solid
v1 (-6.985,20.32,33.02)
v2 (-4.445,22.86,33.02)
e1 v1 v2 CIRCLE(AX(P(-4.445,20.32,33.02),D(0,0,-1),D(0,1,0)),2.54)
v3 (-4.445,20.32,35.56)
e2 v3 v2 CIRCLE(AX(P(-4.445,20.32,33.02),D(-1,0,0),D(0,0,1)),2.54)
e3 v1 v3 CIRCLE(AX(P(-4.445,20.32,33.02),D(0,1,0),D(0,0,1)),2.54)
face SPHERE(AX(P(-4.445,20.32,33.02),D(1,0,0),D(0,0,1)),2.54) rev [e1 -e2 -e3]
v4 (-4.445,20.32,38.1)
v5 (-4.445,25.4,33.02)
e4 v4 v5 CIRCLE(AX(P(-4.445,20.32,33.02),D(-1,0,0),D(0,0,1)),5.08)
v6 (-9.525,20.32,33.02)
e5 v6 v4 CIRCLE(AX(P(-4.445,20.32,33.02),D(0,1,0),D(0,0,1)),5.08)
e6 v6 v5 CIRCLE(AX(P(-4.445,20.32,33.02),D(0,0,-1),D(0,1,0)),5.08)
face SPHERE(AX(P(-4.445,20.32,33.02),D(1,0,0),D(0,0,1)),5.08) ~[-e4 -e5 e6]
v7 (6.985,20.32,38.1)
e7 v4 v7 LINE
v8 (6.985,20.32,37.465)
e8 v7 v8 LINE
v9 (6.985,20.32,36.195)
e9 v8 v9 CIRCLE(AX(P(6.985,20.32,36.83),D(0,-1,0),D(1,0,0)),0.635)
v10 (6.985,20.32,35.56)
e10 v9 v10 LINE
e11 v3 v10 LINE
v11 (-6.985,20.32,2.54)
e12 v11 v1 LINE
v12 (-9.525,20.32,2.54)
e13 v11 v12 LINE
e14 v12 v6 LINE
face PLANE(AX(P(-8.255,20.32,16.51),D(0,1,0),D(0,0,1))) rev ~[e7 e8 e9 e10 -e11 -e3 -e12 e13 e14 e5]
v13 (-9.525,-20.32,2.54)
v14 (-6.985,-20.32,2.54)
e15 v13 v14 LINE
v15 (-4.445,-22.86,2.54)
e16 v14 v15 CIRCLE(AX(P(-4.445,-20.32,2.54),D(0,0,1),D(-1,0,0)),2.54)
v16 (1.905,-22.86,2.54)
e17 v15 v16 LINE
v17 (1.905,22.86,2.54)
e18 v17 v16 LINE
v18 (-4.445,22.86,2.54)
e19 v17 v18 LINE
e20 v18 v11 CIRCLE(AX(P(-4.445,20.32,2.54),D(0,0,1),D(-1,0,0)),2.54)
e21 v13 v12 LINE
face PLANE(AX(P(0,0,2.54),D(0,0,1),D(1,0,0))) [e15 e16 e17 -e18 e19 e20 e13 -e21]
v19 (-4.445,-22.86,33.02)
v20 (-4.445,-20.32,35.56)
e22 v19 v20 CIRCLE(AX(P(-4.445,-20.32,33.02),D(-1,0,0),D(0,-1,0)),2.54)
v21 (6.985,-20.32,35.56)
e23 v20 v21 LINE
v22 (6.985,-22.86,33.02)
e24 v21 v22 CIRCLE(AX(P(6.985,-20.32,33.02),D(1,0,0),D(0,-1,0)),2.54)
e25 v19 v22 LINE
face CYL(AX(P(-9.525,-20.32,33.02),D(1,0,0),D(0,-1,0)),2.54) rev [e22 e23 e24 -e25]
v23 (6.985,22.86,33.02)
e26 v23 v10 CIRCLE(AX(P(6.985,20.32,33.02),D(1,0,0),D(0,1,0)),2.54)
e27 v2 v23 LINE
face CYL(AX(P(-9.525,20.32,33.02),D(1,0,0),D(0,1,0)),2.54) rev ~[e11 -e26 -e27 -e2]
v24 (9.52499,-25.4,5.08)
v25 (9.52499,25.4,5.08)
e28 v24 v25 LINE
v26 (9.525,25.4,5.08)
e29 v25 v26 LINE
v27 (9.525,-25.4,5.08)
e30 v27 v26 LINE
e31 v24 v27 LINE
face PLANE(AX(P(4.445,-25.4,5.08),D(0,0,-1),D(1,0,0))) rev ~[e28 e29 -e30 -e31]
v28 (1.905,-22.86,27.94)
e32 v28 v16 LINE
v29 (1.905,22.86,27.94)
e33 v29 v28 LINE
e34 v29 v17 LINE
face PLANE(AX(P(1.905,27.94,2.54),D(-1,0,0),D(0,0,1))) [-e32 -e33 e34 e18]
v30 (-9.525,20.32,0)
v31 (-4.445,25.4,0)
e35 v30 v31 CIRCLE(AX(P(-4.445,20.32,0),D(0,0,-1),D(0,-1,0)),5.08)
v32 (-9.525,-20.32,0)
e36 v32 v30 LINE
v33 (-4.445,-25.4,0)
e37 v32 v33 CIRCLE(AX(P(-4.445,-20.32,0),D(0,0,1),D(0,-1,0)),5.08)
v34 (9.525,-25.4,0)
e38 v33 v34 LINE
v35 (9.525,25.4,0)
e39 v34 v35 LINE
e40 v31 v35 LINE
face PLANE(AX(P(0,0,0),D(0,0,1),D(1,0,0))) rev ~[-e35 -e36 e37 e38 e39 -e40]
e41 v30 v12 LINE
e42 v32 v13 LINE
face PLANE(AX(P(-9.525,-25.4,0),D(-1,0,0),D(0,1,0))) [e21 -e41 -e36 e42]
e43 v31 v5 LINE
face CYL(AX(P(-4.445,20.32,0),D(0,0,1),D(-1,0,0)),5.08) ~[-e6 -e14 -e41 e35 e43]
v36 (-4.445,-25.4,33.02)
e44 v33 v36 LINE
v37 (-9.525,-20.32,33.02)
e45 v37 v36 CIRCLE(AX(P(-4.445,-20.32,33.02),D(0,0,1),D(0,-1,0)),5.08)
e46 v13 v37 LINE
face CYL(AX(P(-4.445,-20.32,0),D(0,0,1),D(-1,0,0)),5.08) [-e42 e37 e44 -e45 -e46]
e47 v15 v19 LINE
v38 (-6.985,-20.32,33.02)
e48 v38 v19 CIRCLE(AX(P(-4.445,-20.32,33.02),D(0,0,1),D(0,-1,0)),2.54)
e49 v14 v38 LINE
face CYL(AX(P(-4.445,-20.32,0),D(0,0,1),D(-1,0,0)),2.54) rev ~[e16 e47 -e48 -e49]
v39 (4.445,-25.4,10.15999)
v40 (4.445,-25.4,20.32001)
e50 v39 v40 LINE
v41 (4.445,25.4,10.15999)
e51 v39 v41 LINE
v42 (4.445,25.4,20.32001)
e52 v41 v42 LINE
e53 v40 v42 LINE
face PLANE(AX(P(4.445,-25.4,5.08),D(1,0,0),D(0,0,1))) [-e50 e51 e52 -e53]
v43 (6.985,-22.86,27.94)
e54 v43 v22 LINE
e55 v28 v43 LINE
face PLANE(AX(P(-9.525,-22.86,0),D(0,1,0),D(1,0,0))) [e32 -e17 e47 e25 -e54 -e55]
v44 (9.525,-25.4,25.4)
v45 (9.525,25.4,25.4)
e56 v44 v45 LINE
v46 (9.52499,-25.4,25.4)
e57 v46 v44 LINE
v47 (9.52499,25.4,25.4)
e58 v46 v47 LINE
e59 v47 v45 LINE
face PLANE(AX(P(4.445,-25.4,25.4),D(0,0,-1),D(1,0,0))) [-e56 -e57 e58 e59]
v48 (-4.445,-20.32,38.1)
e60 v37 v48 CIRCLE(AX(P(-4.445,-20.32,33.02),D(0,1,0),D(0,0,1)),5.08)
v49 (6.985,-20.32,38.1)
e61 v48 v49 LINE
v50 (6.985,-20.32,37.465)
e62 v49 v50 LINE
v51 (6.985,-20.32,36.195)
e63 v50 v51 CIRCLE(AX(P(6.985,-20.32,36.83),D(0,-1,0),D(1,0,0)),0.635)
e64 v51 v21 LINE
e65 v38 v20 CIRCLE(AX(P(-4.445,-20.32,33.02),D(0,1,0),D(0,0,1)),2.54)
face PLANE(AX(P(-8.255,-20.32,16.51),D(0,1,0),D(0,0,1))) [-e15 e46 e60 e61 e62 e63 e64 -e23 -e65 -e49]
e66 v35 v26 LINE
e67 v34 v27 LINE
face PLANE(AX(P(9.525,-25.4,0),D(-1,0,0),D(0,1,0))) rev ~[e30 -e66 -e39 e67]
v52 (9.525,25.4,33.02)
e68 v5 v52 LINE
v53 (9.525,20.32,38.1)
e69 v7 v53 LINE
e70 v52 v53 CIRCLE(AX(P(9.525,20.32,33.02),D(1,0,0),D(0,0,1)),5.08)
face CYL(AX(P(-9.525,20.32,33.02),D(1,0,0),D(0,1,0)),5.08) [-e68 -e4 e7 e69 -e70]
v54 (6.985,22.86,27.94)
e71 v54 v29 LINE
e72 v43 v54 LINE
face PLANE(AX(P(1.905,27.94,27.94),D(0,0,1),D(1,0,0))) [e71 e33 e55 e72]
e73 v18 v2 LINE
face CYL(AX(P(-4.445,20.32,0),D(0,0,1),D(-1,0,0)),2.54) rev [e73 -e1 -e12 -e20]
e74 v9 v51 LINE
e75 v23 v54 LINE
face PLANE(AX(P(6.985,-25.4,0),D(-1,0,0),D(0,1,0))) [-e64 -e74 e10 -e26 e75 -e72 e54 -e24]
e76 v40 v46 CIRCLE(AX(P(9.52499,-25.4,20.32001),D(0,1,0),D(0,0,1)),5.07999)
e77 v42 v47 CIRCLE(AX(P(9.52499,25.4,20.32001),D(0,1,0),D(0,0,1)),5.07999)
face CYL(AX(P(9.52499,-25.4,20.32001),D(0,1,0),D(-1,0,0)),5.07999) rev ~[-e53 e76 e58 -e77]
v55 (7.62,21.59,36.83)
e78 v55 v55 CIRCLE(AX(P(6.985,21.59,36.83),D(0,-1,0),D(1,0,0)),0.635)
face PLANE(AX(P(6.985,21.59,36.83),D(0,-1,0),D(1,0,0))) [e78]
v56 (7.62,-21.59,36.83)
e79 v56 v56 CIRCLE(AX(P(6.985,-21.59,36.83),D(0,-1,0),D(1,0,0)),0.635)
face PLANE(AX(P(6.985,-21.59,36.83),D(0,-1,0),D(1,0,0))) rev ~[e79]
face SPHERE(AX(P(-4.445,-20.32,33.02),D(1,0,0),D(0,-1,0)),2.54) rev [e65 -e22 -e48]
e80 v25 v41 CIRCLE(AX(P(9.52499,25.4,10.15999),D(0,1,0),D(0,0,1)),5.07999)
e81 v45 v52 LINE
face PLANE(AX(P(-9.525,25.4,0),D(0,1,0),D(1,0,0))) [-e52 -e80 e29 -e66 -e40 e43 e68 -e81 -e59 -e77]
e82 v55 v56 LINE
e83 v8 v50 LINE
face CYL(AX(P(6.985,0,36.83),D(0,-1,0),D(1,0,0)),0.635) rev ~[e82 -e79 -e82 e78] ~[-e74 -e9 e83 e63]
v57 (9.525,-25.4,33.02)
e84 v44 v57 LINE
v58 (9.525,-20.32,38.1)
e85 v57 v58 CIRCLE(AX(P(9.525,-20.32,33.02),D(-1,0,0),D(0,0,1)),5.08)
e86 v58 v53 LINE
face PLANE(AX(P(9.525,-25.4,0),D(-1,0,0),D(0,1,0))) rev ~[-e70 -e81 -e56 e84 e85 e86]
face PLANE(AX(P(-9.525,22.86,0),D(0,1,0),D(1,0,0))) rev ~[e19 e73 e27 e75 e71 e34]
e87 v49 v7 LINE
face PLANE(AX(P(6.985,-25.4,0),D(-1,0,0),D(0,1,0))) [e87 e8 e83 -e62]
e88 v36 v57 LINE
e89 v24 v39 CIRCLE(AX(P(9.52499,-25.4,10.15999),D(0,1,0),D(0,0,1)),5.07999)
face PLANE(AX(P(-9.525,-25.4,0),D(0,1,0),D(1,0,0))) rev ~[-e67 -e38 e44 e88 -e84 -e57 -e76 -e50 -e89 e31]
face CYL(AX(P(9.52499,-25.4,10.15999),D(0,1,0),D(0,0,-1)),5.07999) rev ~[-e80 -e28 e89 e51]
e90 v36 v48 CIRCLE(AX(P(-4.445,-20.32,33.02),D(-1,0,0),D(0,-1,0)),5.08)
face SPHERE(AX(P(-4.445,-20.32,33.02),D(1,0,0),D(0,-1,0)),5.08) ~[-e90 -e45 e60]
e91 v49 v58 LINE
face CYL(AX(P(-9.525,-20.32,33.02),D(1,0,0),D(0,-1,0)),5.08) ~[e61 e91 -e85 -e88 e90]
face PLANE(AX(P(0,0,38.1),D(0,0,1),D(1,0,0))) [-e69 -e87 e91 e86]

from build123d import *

# Parameters (mm, degrees)
F0_W        = 19.05
F0_H        = 50.8
F1_DEPTH    = 38.1
F2_R        = 5.08
F3_W        = 5.08
F3_H        = 20.32
F4_DEPTH    = 50.8
F5_T        = 2.54
F5_T3_DEPTH = 55.88
F6_R        = 5.07999
F7_R        = 0.635
F8_DEPTH    = 21.59


# Not quite as in the source:
# - a fillet or chamfer is up to 0.001 mm smaller than in the source, because OpenCascade refuses the exact size
# - a shell that OpenCascade refuses in one call is made with other operations: the cavity is built on its own and cut out


with BuildPart() as f1:
    # F0 (on Top) → F1 (new body)
    with BuildSketch(Plane.XY):
        Rectangle(F0_W, F0_H)
    extrude(amount=F1_DEPTH)

    # F2
    f2_edges = [f1.edges().sort_by_distance(p)[0] for p in [
        (0, -25.4, 38.1),
        (0, 25.4, 38.1),
        (-9.525, -25.4, 19.05),
        (-9.525, 0, 38.1),
        (-9.525, 25.4, 19.05),
    ]]
    fillet(f2_edges, radius=F2_R)

    # F3 (on face) → F4 (cut)
    with BuildSketch(Plane.XZ.offset(25.4)):
        with Locations((6.985, 15.24)):
            Rectangle(F3_W, F3_H)
    extrude(amount=-F4_DEPTH, mode=Mode.SUBTRACT)

    # F5: shell of thickness 2.54, made by hand


with BuildPart() as f5_core1:
    # F5_t2: copy of F1
    add(f1.part)

    # the walls: a layer under each face that stays
    f5_faces = [f5_core1.faces().sort_by_distance(p)[0] for p in [
        (2.54, -25.4, 16.51),
        (9.525, 0, 2.54),
        (6.985, 0, 5.08),
        (4.445, 0, 15.24),
        (6.985, 0, 25.4),
        (9.525, 0, 31.75),
        (2.54, -23.9121024484, 36.6121024484),
        (-8.0371024484, -23.9121024484, 16.51),
        (0, 0, 0),
        (2.54, 25.4, 16.51),
        (2.54, 23.9121024484, 36.6121024484),
        (-8.0371024484, -22.86, 35.56),
        (-8.0371024484, 23.9121024484, 16.51),
        (-8.0371024484, 22.86, 35.56),
    ]]
    thicken(f5_faces, amount=-F5_T, mode=Mode.SUBTRACT)

    # F5_s4 → F5_t3 (cut)
    with BuildSketch(Plane.XZ.offset(-27.94)):
        Polygon((4.4704, 5.1054), (4.445, 2.54), (1.905, 2.54), (1.905, 5.08), align=None)
        Polygon((4.4704, 25.3746), (1.905, 25.4), (1.905, 27.94), (4.445, 27.94), align=None)
    extrude(amount=F5_T3_DEPTH, mode=Mode.SUBTRACT)


with BuildPart() as f1_1:
    add(f1.part)

    # what is left inside the walls is the cavity
    f5_cavity = [f5_core1.part.solids().sort_by_distance(p)[0] for p in [
        (-9.4996, 0, 22.86),
    ]]
    add(f5_cavity, mode=Mode.SUBTRACT)

    # F6 (radius 5.08 in the source; OpenCascade refuses exactly that, so slightly less here)
    f6_edges = [f1_1.edges().sort_by_distance(p)[0] for p in [
        (4.445, 0, 5.08),
        (4.445, 0, 25.4),
    ]]
    fillet(f6_edges, radius=F6_R)

    # F7 (on Front) → F8 (cut, symmetric)
    with BuildSketch(Plane.XZ):
        with Locations((6.985, 36.83)):
            Circle(F7_R)
    extrude(amount=F8_DEPTH, both=True, mode=Mode.SUBTRACT)


solid = f1_1.part
